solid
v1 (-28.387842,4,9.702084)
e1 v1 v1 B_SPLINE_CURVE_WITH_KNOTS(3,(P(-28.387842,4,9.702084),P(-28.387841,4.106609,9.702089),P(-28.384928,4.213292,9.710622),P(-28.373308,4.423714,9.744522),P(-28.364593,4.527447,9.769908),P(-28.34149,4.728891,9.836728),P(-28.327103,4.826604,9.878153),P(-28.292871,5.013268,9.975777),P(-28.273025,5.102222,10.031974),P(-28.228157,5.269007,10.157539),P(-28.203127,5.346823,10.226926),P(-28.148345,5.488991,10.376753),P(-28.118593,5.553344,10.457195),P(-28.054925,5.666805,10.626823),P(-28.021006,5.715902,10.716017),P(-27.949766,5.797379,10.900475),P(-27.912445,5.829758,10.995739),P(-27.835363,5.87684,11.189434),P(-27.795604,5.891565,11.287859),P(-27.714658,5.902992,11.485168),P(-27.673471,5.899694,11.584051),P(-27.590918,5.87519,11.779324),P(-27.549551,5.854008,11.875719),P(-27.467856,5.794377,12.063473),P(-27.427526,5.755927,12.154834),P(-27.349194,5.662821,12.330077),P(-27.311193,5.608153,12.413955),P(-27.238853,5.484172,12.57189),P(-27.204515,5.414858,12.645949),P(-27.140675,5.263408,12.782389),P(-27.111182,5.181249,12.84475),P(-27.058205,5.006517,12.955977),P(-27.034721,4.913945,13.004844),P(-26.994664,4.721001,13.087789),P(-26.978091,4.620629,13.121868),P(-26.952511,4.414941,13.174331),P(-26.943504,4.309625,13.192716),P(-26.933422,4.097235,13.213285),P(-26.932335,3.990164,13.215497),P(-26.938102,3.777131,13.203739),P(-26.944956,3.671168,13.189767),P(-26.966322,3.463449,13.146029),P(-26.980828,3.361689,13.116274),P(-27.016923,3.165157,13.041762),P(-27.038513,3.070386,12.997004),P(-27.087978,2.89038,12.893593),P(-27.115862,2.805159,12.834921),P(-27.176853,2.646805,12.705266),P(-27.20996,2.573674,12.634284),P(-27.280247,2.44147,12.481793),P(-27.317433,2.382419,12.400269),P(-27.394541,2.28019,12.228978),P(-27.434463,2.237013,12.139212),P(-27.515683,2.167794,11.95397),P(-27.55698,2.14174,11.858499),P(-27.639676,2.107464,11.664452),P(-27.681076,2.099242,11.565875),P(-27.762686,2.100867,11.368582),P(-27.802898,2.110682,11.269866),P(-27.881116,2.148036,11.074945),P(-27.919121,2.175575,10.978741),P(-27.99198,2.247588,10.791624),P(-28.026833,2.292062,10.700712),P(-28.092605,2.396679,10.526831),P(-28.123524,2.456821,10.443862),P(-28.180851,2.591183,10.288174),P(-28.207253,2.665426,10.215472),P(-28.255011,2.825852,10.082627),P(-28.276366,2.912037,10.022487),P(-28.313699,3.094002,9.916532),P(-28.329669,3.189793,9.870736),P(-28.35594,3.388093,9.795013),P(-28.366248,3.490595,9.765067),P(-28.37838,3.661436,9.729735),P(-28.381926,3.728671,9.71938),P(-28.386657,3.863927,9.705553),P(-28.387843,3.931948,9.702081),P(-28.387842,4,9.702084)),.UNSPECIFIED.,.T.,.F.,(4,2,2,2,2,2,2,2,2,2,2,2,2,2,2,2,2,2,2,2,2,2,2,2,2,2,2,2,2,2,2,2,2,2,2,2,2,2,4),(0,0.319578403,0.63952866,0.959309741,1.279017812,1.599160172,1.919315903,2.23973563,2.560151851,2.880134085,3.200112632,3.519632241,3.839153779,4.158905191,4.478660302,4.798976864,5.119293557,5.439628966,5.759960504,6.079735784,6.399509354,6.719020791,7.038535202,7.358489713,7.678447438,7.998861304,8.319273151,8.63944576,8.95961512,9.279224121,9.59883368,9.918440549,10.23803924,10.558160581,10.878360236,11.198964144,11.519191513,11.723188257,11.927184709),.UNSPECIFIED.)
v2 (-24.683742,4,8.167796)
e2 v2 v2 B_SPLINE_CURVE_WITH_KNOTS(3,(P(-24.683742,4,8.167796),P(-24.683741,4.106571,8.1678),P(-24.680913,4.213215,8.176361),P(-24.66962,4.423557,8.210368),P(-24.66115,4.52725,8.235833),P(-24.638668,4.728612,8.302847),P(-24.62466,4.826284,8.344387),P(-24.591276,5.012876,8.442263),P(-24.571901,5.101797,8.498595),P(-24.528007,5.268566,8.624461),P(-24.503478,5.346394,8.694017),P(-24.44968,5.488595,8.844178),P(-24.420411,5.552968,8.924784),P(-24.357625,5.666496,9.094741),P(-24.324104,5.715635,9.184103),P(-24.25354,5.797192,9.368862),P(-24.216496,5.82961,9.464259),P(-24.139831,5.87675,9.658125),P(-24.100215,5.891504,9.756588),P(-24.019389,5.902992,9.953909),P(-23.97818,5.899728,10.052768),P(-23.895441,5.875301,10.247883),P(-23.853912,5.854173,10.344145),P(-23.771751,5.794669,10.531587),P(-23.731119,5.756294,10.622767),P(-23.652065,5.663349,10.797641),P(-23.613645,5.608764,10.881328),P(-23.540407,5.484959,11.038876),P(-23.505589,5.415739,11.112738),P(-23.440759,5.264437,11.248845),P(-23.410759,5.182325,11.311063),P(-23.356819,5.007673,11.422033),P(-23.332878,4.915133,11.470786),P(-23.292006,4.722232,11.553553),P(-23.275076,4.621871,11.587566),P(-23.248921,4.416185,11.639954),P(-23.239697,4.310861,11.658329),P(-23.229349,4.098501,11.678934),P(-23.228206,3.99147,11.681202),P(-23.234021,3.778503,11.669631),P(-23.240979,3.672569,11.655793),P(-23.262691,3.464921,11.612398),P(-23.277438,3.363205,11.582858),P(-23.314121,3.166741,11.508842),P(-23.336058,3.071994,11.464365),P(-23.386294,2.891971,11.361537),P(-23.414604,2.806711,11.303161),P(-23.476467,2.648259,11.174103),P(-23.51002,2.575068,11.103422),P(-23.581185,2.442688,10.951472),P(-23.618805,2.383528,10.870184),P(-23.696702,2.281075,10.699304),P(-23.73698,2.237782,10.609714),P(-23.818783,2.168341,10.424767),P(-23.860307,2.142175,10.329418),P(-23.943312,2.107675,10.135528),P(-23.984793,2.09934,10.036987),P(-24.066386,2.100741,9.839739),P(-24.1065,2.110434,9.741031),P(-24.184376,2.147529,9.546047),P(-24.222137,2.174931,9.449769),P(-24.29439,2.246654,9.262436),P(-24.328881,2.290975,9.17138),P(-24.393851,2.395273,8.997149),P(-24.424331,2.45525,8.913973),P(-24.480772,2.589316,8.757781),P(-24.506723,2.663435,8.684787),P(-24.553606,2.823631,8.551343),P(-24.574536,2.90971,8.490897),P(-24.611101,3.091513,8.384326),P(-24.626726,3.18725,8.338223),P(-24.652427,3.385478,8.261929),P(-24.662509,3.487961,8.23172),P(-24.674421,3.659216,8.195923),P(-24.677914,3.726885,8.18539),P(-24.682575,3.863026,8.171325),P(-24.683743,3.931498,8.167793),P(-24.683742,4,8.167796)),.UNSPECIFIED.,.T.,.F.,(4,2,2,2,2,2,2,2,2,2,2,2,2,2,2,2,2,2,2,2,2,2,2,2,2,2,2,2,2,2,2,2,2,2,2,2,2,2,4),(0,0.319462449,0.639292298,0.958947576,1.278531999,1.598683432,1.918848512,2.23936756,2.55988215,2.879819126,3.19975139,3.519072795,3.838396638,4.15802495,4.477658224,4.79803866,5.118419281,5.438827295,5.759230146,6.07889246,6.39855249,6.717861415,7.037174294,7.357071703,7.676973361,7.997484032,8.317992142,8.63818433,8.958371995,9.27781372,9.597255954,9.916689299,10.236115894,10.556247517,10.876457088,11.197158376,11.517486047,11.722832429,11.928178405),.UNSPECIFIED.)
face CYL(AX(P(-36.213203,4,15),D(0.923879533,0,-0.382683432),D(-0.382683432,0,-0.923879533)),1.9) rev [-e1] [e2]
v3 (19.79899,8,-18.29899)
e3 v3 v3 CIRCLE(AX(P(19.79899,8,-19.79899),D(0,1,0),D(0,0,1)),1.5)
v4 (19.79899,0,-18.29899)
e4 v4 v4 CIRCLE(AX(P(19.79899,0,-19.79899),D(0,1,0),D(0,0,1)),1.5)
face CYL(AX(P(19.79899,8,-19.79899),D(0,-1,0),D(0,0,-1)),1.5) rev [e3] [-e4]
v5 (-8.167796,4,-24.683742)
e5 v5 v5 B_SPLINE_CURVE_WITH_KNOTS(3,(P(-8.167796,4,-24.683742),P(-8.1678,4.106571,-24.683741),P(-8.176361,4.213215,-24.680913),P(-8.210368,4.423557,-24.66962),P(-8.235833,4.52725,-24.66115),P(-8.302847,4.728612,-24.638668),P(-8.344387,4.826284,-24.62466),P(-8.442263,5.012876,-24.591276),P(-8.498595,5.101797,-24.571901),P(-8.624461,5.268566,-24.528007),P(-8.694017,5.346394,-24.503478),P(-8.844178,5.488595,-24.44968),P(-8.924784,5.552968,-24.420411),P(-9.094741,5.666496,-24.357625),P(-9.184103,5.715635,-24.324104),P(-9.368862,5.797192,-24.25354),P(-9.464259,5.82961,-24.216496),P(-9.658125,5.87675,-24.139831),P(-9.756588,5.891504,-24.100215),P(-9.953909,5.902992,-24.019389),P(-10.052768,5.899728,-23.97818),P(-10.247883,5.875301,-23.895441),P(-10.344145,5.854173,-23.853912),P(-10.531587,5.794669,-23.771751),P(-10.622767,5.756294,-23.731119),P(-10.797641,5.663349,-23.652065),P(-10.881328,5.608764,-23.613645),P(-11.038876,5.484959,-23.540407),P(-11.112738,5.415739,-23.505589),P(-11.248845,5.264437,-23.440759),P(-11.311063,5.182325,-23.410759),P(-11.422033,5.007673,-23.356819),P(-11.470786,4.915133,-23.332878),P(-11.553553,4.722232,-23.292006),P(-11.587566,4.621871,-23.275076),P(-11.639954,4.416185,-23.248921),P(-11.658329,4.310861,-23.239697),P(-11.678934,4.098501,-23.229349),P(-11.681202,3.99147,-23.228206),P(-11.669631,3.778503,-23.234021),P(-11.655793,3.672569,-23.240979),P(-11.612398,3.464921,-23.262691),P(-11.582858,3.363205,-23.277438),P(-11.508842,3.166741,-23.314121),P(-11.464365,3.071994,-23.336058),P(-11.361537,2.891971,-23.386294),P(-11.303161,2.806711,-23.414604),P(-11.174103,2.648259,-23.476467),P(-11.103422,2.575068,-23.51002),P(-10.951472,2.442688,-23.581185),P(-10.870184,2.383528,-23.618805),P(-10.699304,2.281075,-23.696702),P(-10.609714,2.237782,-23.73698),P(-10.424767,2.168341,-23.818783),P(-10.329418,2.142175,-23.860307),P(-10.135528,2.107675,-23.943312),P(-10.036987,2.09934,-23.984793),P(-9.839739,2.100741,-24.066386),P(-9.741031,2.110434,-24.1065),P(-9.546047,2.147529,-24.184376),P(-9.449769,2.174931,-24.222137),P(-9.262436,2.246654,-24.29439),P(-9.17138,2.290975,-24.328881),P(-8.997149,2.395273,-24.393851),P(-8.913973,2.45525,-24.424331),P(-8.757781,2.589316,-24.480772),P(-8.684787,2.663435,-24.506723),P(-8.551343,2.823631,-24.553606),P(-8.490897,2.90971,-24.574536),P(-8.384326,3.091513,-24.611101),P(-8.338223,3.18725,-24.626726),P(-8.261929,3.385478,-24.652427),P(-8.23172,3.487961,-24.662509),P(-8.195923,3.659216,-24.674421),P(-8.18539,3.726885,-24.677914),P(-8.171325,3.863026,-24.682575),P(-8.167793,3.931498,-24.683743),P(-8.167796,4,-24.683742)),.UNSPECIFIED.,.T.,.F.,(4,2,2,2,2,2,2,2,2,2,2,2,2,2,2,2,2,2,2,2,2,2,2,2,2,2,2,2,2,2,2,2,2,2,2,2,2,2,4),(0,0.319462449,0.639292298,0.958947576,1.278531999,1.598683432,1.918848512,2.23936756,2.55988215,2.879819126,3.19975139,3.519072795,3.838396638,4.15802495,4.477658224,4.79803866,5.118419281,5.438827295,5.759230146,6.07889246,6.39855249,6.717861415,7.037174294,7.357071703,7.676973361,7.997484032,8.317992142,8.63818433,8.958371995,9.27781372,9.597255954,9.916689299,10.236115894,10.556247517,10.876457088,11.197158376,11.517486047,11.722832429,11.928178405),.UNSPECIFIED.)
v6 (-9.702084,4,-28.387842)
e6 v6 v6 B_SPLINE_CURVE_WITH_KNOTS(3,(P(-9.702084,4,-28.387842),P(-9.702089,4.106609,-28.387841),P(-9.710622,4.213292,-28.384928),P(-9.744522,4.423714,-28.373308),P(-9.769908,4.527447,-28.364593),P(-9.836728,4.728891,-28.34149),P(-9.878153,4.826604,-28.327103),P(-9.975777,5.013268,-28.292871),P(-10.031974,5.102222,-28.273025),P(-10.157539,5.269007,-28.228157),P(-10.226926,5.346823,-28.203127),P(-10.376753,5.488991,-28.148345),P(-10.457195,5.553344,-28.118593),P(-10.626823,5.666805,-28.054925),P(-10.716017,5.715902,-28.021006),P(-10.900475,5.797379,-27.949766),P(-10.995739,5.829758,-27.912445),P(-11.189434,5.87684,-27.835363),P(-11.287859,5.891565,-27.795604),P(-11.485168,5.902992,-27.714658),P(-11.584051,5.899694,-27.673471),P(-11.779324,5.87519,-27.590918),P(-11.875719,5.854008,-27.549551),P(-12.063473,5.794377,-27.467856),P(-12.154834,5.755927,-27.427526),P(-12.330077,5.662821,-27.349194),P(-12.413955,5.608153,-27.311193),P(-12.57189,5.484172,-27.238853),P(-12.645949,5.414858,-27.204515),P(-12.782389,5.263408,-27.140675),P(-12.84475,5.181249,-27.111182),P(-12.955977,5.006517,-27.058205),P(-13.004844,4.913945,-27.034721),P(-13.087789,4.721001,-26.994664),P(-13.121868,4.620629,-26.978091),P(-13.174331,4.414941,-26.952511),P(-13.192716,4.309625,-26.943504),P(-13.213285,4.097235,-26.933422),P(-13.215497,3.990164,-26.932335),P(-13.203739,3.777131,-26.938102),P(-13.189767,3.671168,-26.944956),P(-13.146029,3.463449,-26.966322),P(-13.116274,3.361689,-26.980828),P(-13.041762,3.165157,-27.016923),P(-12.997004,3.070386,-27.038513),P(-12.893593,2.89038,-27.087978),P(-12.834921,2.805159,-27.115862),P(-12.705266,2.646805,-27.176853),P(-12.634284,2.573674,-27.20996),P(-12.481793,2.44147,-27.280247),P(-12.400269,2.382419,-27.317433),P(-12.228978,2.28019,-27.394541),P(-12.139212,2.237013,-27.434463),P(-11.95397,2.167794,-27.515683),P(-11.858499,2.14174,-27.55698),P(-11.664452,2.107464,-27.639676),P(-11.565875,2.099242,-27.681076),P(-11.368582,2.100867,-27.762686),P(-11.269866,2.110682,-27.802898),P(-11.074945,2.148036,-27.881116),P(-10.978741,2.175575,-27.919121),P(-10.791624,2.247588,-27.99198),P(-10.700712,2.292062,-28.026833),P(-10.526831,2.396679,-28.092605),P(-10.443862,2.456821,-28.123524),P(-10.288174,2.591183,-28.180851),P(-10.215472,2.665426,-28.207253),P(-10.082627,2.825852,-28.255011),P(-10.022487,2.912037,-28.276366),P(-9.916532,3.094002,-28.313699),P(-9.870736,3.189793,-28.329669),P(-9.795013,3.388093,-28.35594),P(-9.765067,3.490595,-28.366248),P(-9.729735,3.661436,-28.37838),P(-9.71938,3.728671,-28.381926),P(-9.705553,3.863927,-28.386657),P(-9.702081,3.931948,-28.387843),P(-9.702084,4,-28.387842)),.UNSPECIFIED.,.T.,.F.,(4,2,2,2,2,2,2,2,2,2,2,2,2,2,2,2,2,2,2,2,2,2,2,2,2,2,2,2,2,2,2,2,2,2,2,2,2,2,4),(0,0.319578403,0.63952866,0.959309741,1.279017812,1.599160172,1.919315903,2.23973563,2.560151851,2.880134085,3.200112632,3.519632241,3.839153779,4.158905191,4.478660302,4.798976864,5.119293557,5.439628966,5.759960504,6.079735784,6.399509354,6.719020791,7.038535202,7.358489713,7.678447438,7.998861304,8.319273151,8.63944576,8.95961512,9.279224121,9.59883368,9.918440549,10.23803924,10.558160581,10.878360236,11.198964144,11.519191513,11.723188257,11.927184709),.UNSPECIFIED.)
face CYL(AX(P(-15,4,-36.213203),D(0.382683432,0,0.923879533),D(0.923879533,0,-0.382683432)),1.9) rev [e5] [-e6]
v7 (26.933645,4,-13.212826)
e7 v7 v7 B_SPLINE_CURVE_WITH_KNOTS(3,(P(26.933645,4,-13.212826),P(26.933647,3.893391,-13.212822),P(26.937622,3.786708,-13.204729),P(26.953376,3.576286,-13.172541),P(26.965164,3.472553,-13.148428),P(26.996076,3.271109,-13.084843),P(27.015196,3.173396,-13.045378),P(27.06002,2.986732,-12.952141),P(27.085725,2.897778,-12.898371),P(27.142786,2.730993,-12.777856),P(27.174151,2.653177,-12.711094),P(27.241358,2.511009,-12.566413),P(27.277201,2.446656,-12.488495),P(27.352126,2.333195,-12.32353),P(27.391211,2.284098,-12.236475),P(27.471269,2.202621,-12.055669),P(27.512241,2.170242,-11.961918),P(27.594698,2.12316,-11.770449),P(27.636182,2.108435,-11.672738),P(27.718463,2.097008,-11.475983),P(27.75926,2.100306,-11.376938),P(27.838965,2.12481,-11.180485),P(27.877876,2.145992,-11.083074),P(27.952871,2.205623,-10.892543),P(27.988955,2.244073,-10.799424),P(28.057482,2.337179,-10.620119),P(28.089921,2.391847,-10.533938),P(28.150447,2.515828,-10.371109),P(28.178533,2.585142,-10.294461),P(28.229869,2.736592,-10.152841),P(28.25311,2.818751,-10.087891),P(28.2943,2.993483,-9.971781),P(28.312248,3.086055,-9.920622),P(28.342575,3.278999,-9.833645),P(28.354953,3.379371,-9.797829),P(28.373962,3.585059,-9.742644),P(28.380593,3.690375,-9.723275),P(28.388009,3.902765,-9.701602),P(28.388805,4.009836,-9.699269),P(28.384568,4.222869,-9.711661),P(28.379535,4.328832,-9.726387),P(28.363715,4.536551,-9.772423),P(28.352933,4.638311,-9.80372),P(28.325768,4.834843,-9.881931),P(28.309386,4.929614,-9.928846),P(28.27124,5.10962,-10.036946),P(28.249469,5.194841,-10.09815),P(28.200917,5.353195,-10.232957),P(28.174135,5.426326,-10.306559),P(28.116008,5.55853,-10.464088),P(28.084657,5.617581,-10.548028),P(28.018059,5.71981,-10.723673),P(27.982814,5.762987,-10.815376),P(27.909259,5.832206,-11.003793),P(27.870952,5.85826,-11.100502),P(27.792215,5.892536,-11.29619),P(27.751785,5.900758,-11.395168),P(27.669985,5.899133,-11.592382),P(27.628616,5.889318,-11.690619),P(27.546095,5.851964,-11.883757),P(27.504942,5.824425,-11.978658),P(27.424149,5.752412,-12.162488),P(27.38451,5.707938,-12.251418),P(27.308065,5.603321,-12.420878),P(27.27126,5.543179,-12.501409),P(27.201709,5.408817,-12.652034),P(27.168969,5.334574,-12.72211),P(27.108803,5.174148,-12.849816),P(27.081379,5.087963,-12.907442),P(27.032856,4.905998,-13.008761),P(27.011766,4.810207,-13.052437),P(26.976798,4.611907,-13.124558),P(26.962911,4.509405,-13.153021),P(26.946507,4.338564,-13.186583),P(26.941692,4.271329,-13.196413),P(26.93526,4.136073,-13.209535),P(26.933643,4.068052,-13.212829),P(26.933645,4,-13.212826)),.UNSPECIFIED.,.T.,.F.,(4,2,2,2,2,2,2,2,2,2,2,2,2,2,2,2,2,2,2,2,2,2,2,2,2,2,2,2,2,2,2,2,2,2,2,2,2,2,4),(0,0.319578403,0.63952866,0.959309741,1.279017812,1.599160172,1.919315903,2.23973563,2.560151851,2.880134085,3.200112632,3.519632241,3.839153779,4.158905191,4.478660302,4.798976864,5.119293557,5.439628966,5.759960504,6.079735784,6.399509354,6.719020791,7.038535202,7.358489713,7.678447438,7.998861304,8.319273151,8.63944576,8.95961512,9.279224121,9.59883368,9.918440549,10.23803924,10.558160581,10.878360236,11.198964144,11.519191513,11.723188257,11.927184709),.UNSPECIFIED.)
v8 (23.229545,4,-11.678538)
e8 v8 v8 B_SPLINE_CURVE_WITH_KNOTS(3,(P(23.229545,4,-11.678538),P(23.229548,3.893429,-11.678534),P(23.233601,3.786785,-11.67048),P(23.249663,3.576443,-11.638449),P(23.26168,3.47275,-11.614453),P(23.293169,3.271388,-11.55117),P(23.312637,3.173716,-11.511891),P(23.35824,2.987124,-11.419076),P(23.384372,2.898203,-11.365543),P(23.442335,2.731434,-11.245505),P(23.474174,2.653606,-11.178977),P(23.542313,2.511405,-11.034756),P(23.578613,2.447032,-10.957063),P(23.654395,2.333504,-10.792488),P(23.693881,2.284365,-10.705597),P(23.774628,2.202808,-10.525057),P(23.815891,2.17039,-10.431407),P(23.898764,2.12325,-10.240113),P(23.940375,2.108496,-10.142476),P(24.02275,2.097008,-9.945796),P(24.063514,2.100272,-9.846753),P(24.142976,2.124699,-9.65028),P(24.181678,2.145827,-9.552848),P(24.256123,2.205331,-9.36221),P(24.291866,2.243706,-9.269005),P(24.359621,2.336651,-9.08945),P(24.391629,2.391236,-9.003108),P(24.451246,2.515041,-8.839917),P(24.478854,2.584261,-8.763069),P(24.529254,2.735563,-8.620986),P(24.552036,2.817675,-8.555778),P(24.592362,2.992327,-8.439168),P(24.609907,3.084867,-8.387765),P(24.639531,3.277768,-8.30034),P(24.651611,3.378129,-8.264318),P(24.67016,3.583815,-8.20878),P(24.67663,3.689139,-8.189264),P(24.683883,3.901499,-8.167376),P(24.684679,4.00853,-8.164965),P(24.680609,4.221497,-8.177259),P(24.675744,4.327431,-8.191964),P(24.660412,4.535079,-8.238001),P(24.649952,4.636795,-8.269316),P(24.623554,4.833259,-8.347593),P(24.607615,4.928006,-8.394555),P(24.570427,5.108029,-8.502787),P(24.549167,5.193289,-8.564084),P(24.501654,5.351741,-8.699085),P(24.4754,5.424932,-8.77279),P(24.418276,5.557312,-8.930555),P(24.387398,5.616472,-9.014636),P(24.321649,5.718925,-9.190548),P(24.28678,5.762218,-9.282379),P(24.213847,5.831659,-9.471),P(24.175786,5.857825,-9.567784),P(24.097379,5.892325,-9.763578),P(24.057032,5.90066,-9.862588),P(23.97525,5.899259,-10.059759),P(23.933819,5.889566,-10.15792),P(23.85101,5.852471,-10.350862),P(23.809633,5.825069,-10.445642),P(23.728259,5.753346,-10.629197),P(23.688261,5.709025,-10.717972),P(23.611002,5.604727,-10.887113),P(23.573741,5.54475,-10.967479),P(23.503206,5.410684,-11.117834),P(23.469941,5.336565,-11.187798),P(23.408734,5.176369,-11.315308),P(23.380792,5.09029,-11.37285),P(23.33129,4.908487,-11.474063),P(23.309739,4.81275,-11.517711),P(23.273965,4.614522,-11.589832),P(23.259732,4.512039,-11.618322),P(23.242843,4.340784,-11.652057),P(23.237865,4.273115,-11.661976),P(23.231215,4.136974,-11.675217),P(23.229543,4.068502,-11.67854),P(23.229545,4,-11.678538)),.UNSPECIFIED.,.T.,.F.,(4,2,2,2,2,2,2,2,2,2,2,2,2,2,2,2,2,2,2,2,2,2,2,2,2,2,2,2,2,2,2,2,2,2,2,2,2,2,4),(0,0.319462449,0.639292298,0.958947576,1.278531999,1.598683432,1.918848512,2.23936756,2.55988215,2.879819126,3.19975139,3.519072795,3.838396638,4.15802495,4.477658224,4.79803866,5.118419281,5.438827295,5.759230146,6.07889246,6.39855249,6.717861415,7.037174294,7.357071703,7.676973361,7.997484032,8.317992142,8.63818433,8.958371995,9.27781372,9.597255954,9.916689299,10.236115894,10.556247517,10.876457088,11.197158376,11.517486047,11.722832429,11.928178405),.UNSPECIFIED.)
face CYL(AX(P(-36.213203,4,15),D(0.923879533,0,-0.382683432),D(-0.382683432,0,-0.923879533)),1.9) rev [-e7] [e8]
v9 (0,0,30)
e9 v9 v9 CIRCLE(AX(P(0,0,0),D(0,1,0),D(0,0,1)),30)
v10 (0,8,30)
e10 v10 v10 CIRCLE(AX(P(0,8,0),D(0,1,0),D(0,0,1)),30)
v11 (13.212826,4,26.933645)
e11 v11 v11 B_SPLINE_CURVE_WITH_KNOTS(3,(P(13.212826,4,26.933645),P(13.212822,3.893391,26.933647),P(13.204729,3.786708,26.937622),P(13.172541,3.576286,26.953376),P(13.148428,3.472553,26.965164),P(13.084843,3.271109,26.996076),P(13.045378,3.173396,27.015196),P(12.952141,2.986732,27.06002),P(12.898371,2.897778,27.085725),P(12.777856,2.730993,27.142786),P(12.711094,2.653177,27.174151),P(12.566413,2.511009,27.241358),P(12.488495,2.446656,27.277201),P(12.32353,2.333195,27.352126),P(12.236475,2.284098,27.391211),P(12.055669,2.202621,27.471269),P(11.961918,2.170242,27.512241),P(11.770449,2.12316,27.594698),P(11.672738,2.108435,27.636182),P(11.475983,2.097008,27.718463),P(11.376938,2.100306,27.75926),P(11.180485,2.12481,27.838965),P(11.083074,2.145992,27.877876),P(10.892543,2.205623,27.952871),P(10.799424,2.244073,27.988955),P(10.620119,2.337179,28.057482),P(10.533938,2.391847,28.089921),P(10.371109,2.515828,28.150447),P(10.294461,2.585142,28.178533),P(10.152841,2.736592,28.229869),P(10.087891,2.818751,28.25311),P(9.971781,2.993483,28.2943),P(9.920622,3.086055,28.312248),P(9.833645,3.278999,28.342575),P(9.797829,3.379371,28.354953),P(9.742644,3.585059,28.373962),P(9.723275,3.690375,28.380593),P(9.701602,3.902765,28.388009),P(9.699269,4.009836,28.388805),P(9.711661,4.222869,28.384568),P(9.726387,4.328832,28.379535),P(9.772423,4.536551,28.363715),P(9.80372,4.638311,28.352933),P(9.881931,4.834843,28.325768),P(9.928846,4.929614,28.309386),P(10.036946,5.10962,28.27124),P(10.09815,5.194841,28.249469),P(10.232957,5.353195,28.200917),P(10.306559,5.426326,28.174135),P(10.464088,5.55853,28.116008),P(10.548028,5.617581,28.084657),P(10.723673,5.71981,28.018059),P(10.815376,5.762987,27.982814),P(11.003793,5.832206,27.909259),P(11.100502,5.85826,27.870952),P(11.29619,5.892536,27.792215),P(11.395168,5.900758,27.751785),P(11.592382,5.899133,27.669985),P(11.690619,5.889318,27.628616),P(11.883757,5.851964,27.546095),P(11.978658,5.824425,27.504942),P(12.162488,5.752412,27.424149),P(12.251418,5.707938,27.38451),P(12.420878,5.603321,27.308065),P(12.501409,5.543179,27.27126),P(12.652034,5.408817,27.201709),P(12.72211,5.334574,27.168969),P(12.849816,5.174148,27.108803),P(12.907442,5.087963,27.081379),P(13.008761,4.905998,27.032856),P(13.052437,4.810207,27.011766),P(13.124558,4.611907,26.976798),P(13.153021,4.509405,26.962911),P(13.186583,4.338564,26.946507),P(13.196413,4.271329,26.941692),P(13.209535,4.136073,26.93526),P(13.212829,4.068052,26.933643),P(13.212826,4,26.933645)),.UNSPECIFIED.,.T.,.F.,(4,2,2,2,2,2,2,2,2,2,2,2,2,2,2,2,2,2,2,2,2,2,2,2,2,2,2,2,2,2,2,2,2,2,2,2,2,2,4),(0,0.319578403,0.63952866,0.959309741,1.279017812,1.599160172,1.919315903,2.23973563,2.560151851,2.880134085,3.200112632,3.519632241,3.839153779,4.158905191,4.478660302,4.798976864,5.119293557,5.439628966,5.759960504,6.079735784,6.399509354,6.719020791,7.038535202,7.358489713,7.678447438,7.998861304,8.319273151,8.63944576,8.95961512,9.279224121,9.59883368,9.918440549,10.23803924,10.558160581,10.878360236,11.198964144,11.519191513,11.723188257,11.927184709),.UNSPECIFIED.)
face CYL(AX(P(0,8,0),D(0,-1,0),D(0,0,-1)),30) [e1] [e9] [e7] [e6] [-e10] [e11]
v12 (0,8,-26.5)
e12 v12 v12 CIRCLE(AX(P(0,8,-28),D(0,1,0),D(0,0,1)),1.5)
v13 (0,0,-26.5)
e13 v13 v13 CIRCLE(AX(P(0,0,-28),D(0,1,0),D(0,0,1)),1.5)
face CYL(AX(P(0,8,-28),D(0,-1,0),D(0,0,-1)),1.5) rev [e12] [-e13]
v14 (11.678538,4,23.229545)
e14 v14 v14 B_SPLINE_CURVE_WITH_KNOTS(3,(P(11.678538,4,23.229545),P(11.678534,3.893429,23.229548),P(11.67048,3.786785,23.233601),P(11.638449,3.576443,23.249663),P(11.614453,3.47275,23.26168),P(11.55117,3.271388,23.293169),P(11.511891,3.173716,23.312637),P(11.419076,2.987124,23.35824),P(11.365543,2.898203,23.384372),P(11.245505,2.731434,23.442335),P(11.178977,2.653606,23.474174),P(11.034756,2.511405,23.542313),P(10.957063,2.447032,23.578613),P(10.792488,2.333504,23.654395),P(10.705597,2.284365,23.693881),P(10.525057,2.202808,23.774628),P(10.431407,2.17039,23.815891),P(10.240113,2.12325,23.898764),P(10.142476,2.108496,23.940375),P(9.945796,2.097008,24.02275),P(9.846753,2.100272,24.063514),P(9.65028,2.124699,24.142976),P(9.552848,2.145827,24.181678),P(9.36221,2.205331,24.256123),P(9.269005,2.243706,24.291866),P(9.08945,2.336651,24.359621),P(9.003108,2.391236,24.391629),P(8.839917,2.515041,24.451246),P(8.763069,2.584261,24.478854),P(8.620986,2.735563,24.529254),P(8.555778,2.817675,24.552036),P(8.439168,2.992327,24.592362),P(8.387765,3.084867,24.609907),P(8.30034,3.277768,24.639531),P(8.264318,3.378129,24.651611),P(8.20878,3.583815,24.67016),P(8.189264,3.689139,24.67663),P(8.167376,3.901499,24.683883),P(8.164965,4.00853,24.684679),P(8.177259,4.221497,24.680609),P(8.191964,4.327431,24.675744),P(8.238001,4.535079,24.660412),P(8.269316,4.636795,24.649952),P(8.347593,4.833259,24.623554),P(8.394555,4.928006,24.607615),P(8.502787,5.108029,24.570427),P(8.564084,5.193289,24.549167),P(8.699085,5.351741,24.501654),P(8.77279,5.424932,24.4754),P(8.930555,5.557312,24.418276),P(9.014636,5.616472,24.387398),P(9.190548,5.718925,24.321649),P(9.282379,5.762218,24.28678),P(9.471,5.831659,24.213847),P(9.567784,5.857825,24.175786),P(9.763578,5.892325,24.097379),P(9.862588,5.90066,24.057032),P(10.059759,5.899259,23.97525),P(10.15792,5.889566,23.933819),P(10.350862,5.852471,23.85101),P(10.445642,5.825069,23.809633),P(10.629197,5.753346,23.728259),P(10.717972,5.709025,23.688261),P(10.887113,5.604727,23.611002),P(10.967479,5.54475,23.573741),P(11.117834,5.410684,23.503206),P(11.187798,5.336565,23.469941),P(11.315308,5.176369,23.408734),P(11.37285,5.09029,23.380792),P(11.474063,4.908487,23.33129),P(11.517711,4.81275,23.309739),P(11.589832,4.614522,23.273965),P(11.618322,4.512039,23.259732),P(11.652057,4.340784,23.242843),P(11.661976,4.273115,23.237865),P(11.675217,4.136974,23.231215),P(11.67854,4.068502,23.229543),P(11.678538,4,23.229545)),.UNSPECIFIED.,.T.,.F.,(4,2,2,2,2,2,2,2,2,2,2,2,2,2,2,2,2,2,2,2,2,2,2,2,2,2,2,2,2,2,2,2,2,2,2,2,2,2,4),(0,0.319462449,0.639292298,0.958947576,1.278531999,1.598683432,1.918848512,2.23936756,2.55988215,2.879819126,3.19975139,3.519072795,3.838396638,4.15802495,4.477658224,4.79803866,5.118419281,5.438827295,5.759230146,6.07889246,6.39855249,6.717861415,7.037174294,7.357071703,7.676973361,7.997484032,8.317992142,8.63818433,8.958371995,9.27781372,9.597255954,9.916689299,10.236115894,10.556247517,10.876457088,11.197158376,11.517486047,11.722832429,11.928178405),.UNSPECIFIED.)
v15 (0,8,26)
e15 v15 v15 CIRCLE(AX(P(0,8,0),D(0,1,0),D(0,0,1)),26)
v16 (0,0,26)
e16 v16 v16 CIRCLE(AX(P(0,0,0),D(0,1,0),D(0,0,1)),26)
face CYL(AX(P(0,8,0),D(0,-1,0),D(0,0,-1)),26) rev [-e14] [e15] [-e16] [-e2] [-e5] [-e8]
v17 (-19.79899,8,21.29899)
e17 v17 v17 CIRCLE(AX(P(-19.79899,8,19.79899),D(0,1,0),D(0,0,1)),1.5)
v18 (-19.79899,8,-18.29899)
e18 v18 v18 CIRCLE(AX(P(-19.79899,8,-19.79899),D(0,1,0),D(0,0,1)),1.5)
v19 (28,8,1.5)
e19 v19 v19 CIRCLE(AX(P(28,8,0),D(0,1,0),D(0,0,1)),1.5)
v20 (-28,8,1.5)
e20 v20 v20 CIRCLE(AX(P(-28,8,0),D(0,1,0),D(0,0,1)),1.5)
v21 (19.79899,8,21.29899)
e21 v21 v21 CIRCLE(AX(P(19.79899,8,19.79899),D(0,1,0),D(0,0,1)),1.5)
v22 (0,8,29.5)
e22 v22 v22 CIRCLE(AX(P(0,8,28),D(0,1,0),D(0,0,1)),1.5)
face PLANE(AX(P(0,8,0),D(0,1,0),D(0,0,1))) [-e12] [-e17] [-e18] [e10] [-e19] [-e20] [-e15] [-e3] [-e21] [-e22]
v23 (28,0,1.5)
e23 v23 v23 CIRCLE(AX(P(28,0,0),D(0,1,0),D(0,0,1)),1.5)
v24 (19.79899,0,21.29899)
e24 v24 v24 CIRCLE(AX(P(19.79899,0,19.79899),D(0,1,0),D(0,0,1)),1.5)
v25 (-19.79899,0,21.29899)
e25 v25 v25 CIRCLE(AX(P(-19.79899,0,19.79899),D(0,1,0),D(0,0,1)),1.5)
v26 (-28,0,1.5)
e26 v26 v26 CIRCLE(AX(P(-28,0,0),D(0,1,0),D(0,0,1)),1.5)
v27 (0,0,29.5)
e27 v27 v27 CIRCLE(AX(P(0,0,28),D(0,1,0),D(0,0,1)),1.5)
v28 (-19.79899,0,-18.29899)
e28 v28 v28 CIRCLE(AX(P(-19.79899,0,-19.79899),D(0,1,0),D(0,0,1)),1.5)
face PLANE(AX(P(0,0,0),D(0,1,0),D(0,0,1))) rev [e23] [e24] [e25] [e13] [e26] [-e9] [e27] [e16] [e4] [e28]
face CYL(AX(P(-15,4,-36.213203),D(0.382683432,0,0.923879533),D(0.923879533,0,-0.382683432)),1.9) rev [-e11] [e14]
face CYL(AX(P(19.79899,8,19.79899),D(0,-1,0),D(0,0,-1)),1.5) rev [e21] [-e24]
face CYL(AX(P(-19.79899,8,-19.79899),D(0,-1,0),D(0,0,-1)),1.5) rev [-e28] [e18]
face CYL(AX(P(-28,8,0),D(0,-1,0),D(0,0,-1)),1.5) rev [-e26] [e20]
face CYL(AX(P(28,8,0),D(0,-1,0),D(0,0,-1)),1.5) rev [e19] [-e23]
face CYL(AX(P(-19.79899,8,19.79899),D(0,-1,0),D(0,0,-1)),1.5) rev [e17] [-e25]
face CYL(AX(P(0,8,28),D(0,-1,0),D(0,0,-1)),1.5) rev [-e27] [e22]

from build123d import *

# Parameters (mm, degrees)
EXTRUDE_1_OUTLINE_R      = 30
EXTRUDE_1_OUTLINE_R_2    = 1.5
EXTRUDE_1_OUTLINE_R_3    = 26
EXTRUDE_1_DEPTH          = 8
CUT_EXTRUDE_1_DEPTH      = 44.17406629
CUT_EXTRUDE_1_DEPTH_BACK = 44.17406629
CUT_EXTRUDE_2_DEPTH      = 44.174066447
CUT_EXTRUDE_2_DEPTH_BACK = 44.174066447
SKETCH_5_R               = 1.9


# Read off the part's stored shape, not the designer's step: 凸台-拉伸1
with BuildPart() as part:
    # 凸台-拉伸1 outline → 凸台-拉伸1 (new body)
    with BuildSketch(Plane(origin=(0, 0, 0), x_dir=(1, 0, 0), z_dir=(0, 1, 0))):
        Circle(EXTRUDE_1_OUTLINE_R)
        with Locations((-19.798989873, -19.798989873)):
            Circle(EXTRUDE_1_OUTLINE_R_2, mode=Mode.SUBTRACT)
        with Locations((0, -28)):
            Circle(EXTRUDE_1_OUTLINE_R_2, mode=Mode.SUBTRACT)
        with Locations((19.798989873, -19.798989873)):
            Circle(EXTRUDE_1_OUTLINE_R_2, mode=Mode.SUBTRACT)
        with Locations((-28, 0)):
            Circle(EXTRUDE_1_OUTLINE_R_2, mode=Mode.SUBTRACT)
        with Locations((-19.798989873, 19.798989873)):
            Circle(EXTRUDE_1_OUTLINE_R_2, mode=Mode.SUBTRACT)
        Circle(EXTRUDE_1_OUTLINE_R_3, mode=Mode.SUBTRACT)
        with Locations((28, 0)):
            Circle(EXTRUDE_1_OUTLINE_R_2, mode=Mode.SUBTRACT)
        with Locations((0, 28)):
            Circle(EXTRUDE_1_OUTLINE_R_2, mode=Mode.SUBTRACT)
        with Locations((19.798989873, 19.798989873)):
            Circle(EXTRUDE_1_OUTLINE_R_2, mode=Mode.SUBTRACT)
    extrude(amount=EXTRUDE_1_DEPTH)

    # 草图4 → 切除-拉伸1 (cut, two sides: drawn at the far end of the back side and taken through both)
    with BuildSketch(Plane(origin=(0, 0, 0), x_dir=(-0.38268343236509067, 0, -0.9238795325112864), z_dir=(0.9238795325112864, 0, -0.38268343236509067)).offset(-CUT_EXTRUDE_1_DEPTH_BACK)):
        with BuildLine():
            ThreePointArc((0, 5.9), (-1.9, 4), (0, 2.1))
            Line((0, 2.1), (0, 5.9))
        make_face()
        with BuildLine():
            Line((0, 5.9), (0, 2.1))
            ThreePointArc((0, 2.1), (1.343502884, 2.656497116), (1.9, 4))
            ThreePointArc((1.9, 4), (1.343502884, 5.343502884), (0, 5.9))
        make_face()
    extrude(amount=CUT_EXTRUDE_1_DEPTH + CUT_EXTRUDE_1_DEPTH_BACK, mode=Mode.SUBTRACT)

    # 草图5 → 切除-拉伸2 (cut, two sides: drawn at the far end of the back side and taken through both)
    with BuildSketch(Plane(origin=(0, 0, 0), x_dir=(0.9238795325112864, 0, -0.3826834323650906), z_dir=(0.3826834323650906, 0, 0.9238795325112864)).offset(-CUT_EXTRUDE_2_DEPTH_BACK)):
        with Locations((0, 4)):
            Circle(SKETCH_5_R)
    extrude(amount=CUT_EXTRUDE_2_DEPTH + CUT_EXTRUDE_2_DEPTH_BACK, mode=Mode.SUBTRACT)


solid = part.part
